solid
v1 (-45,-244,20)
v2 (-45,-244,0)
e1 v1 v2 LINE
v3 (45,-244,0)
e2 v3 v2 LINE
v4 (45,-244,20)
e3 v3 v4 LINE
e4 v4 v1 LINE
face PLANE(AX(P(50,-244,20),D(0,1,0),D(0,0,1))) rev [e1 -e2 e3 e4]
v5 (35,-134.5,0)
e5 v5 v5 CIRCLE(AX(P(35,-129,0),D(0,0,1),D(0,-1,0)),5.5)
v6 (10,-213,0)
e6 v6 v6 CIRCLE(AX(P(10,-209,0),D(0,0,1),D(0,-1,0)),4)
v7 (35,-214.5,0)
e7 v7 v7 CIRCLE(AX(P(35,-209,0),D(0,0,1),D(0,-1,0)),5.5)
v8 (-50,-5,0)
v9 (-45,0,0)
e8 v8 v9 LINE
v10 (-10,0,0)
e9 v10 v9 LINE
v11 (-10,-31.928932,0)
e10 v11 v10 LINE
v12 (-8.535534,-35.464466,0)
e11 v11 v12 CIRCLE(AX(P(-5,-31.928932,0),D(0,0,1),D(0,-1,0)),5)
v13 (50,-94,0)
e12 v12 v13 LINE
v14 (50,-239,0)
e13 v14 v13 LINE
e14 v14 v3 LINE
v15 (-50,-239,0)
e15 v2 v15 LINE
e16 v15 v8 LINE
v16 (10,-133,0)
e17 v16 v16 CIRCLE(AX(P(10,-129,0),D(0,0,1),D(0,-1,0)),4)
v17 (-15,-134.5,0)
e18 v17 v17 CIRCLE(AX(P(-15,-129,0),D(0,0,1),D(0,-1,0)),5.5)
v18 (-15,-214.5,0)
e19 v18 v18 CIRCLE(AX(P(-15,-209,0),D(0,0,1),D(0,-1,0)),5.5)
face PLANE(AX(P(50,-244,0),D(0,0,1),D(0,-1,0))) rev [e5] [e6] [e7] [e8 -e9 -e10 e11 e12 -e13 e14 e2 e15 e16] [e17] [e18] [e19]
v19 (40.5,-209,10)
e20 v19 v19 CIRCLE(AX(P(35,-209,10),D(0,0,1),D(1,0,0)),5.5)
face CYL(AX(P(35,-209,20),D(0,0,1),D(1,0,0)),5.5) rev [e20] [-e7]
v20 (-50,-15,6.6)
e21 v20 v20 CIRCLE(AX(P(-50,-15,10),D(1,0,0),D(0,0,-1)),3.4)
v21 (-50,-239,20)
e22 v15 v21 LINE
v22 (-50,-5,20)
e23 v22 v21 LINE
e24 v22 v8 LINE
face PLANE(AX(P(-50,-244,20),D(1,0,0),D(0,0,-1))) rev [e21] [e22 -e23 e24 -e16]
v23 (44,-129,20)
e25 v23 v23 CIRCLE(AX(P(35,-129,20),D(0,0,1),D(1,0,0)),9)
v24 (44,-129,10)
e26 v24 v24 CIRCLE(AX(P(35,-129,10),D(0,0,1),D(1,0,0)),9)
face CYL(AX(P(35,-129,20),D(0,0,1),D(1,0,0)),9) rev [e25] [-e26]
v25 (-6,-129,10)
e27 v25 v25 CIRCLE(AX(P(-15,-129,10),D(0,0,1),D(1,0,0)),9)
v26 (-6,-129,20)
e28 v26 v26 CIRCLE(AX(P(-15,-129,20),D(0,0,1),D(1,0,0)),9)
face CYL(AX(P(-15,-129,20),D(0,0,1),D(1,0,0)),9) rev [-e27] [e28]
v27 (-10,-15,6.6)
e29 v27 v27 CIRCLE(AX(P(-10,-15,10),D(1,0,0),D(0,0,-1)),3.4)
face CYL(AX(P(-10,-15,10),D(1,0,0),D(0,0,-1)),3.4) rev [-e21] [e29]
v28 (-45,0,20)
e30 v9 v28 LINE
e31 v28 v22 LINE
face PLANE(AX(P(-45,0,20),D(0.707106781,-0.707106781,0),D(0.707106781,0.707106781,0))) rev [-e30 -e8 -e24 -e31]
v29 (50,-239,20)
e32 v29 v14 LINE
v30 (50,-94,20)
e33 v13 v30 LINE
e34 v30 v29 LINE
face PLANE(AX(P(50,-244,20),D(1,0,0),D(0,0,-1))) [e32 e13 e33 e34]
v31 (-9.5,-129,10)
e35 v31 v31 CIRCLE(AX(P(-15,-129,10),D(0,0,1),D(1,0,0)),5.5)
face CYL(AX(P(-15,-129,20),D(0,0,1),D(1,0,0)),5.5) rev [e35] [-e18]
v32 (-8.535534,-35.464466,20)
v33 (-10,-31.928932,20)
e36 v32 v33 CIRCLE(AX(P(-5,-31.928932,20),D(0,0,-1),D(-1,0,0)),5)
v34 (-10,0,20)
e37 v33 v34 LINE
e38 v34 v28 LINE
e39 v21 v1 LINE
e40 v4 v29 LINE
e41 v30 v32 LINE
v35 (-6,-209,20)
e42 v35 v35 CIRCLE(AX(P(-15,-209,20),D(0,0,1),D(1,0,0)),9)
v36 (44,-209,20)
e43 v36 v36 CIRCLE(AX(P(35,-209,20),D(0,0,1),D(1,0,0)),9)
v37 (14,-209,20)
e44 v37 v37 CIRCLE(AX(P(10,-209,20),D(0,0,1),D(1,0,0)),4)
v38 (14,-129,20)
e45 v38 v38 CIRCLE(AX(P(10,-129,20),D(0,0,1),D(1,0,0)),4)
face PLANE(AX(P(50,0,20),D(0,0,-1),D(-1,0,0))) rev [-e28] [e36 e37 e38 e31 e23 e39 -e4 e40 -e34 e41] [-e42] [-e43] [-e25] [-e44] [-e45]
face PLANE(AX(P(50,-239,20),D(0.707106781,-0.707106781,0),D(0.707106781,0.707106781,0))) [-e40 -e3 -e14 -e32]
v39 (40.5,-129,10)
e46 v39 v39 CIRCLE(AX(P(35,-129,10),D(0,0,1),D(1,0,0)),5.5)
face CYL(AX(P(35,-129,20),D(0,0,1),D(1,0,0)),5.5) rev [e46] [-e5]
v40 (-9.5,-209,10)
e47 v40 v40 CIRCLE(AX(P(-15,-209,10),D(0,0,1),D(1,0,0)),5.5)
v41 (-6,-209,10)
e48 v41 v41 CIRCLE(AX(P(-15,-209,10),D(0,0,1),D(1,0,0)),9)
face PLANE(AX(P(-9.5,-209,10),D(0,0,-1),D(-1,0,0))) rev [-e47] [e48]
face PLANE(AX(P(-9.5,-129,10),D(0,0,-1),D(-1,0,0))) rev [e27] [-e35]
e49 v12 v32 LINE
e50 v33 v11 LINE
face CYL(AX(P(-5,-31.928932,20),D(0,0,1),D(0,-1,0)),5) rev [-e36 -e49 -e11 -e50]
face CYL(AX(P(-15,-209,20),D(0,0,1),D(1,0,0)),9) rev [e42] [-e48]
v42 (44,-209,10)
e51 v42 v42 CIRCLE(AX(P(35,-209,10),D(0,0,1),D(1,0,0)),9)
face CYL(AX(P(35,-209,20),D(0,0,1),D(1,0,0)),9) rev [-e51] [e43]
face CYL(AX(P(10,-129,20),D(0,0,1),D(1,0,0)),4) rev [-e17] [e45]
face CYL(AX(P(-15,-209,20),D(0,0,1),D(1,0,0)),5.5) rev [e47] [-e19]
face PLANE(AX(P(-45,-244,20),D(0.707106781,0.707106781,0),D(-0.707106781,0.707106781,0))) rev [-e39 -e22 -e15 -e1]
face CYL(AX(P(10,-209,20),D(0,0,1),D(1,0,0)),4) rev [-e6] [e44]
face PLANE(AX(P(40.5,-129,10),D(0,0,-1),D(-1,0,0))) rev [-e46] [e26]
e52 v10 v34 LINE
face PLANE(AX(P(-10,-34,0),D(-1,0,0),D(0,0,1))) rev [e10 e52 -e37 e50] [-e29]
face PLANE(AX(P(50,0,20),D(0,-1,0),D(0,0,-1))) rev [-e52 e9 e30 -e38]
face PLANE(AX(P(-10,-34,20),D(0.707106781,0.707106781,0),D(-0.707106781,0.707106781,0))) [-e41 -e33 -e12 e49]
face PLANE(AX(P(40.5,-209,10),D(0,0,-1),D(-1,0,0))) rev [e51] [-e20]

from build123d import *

# Parameters (mm, degrees)
SKETCH_3_W                    = 20
SKETCH_3_H                    = 244
EXTRUDE_1_DEPTH               = 50
SKETCH_4_W                    = 60
SKETCH_4_H                    = 20
CUT_EXTRUDE_1_DEPTH           = 34
HOLE_WIZARD_M8_1_D            = 6.8
CHAMFER_1_SIZE                = 60
CHAMFER_2_SIZE                = 5
HOLE_WIZARD_M10_1_D           = 11
HOLE_WIZARD_M10_1_CBORE_D     = 18
HOLE_WIZARD_M10_1_CBORE_DEPTH = 10
HOLE_WIZARD_8_0_8_1_D         = 8
FILLET_1_DEPTH                = 20


with BuildPart() as part:
    # 草圖3 → 伸長1 (new, symmetric)
    with BuildSketch(Plane(origin=(0, 0, 0), x_dir=(0, 0, -1), z_dir=(1, 0, 0))):
        with Locations((-10, -122)):
            Rectangle(SKETCH_3_W, SKETCH_3_H)
    extrude(amount=EXTRUDE_1_DEPTH, both=True)

    # 草圖4 → 除料-伸長1 (cut)
    with BuildSketch(Plane(origin=(0, 0, 0), x_dir=(1, 0, 0), z_dir=(0, 1, 0))):
        with Locations((20, -10)):
            Rectangle(SKETCH_4_W, SKETCH_4_H)
    extrude(amount=-CUT_EXTRUDE_1_DEPTH, mode=Mode.SUBTRACT)

    # M8 螺紋孔1 (through all)
    with Locations(Plane(origin=(-10, -84.062632567, -21.444178573), x_dir=(0, 0, 1), z_dir=(1, 0, 0))):
        with Locations((31.444178573, -69.062632567)):
            Hole(HOLE_WIZARD_M8_1_D / 2)

    # 導角1
    chamfer_1_edges = [part.edges().sort_by_distance(p)[0] for p in [
        (50, -34, 10),
    ]]
    chamfer(chamfer_1_edges, length=CHAMFER_1_SIZE - 0.0001)  # a hair under: the kernel refuses the full size

    # 導角2
    chamfer_2_edges = [part.edges().sort_by_distance(p)[0] for p in [
        (-50, 0, 10),
        (-50, -244, 10),
        (50, -244, 10),
    ]]
    chamfer(chamfer_2_edges, length=CHAMFER_2_SIZE)

    # M10 六角承窩頭蓋螺釘的柱孔1 (through all)
    with Locations(Plane.XY.offset(20)):
        with Locations((-15, -129), (35, -129), (-15, -209), (35, -209)):
            CounterBoreHole(HOLE_WIZARD_M10_1_D / 2, HOLE_WIZARD_M10_1_CBORE_D / 2, HOLE_WIZARD_M10_1_CBORE_DEPTH)

    # Ø8.0 (8) 直徑孔1 (through all)
    with Locations(Plane.XY.offset(20)):
        with Locations((10, -129), (10, -209)):
            Hole(HOLE_WIZARD_8_0_8_1_D / 2)

    # 圓角1: read off the stored shape, not the designer's step
    # 圓角1 outline → 圓角1 (add)
    with BuildSketch(Plane.XY):
        with BuildLine():
            ThreePointArc((-8.535533906, -35.464466094), (-9.619397663, -33.84234935), (-10, -31.928932188))
            Line((-10, -31.928932188), (-10, -34))
            Line((-10, -34), (-8.535533906, -35.464466094))
        make_face()
    extrude(amount=FILLET_1_DEPTH)


solid = part.part
